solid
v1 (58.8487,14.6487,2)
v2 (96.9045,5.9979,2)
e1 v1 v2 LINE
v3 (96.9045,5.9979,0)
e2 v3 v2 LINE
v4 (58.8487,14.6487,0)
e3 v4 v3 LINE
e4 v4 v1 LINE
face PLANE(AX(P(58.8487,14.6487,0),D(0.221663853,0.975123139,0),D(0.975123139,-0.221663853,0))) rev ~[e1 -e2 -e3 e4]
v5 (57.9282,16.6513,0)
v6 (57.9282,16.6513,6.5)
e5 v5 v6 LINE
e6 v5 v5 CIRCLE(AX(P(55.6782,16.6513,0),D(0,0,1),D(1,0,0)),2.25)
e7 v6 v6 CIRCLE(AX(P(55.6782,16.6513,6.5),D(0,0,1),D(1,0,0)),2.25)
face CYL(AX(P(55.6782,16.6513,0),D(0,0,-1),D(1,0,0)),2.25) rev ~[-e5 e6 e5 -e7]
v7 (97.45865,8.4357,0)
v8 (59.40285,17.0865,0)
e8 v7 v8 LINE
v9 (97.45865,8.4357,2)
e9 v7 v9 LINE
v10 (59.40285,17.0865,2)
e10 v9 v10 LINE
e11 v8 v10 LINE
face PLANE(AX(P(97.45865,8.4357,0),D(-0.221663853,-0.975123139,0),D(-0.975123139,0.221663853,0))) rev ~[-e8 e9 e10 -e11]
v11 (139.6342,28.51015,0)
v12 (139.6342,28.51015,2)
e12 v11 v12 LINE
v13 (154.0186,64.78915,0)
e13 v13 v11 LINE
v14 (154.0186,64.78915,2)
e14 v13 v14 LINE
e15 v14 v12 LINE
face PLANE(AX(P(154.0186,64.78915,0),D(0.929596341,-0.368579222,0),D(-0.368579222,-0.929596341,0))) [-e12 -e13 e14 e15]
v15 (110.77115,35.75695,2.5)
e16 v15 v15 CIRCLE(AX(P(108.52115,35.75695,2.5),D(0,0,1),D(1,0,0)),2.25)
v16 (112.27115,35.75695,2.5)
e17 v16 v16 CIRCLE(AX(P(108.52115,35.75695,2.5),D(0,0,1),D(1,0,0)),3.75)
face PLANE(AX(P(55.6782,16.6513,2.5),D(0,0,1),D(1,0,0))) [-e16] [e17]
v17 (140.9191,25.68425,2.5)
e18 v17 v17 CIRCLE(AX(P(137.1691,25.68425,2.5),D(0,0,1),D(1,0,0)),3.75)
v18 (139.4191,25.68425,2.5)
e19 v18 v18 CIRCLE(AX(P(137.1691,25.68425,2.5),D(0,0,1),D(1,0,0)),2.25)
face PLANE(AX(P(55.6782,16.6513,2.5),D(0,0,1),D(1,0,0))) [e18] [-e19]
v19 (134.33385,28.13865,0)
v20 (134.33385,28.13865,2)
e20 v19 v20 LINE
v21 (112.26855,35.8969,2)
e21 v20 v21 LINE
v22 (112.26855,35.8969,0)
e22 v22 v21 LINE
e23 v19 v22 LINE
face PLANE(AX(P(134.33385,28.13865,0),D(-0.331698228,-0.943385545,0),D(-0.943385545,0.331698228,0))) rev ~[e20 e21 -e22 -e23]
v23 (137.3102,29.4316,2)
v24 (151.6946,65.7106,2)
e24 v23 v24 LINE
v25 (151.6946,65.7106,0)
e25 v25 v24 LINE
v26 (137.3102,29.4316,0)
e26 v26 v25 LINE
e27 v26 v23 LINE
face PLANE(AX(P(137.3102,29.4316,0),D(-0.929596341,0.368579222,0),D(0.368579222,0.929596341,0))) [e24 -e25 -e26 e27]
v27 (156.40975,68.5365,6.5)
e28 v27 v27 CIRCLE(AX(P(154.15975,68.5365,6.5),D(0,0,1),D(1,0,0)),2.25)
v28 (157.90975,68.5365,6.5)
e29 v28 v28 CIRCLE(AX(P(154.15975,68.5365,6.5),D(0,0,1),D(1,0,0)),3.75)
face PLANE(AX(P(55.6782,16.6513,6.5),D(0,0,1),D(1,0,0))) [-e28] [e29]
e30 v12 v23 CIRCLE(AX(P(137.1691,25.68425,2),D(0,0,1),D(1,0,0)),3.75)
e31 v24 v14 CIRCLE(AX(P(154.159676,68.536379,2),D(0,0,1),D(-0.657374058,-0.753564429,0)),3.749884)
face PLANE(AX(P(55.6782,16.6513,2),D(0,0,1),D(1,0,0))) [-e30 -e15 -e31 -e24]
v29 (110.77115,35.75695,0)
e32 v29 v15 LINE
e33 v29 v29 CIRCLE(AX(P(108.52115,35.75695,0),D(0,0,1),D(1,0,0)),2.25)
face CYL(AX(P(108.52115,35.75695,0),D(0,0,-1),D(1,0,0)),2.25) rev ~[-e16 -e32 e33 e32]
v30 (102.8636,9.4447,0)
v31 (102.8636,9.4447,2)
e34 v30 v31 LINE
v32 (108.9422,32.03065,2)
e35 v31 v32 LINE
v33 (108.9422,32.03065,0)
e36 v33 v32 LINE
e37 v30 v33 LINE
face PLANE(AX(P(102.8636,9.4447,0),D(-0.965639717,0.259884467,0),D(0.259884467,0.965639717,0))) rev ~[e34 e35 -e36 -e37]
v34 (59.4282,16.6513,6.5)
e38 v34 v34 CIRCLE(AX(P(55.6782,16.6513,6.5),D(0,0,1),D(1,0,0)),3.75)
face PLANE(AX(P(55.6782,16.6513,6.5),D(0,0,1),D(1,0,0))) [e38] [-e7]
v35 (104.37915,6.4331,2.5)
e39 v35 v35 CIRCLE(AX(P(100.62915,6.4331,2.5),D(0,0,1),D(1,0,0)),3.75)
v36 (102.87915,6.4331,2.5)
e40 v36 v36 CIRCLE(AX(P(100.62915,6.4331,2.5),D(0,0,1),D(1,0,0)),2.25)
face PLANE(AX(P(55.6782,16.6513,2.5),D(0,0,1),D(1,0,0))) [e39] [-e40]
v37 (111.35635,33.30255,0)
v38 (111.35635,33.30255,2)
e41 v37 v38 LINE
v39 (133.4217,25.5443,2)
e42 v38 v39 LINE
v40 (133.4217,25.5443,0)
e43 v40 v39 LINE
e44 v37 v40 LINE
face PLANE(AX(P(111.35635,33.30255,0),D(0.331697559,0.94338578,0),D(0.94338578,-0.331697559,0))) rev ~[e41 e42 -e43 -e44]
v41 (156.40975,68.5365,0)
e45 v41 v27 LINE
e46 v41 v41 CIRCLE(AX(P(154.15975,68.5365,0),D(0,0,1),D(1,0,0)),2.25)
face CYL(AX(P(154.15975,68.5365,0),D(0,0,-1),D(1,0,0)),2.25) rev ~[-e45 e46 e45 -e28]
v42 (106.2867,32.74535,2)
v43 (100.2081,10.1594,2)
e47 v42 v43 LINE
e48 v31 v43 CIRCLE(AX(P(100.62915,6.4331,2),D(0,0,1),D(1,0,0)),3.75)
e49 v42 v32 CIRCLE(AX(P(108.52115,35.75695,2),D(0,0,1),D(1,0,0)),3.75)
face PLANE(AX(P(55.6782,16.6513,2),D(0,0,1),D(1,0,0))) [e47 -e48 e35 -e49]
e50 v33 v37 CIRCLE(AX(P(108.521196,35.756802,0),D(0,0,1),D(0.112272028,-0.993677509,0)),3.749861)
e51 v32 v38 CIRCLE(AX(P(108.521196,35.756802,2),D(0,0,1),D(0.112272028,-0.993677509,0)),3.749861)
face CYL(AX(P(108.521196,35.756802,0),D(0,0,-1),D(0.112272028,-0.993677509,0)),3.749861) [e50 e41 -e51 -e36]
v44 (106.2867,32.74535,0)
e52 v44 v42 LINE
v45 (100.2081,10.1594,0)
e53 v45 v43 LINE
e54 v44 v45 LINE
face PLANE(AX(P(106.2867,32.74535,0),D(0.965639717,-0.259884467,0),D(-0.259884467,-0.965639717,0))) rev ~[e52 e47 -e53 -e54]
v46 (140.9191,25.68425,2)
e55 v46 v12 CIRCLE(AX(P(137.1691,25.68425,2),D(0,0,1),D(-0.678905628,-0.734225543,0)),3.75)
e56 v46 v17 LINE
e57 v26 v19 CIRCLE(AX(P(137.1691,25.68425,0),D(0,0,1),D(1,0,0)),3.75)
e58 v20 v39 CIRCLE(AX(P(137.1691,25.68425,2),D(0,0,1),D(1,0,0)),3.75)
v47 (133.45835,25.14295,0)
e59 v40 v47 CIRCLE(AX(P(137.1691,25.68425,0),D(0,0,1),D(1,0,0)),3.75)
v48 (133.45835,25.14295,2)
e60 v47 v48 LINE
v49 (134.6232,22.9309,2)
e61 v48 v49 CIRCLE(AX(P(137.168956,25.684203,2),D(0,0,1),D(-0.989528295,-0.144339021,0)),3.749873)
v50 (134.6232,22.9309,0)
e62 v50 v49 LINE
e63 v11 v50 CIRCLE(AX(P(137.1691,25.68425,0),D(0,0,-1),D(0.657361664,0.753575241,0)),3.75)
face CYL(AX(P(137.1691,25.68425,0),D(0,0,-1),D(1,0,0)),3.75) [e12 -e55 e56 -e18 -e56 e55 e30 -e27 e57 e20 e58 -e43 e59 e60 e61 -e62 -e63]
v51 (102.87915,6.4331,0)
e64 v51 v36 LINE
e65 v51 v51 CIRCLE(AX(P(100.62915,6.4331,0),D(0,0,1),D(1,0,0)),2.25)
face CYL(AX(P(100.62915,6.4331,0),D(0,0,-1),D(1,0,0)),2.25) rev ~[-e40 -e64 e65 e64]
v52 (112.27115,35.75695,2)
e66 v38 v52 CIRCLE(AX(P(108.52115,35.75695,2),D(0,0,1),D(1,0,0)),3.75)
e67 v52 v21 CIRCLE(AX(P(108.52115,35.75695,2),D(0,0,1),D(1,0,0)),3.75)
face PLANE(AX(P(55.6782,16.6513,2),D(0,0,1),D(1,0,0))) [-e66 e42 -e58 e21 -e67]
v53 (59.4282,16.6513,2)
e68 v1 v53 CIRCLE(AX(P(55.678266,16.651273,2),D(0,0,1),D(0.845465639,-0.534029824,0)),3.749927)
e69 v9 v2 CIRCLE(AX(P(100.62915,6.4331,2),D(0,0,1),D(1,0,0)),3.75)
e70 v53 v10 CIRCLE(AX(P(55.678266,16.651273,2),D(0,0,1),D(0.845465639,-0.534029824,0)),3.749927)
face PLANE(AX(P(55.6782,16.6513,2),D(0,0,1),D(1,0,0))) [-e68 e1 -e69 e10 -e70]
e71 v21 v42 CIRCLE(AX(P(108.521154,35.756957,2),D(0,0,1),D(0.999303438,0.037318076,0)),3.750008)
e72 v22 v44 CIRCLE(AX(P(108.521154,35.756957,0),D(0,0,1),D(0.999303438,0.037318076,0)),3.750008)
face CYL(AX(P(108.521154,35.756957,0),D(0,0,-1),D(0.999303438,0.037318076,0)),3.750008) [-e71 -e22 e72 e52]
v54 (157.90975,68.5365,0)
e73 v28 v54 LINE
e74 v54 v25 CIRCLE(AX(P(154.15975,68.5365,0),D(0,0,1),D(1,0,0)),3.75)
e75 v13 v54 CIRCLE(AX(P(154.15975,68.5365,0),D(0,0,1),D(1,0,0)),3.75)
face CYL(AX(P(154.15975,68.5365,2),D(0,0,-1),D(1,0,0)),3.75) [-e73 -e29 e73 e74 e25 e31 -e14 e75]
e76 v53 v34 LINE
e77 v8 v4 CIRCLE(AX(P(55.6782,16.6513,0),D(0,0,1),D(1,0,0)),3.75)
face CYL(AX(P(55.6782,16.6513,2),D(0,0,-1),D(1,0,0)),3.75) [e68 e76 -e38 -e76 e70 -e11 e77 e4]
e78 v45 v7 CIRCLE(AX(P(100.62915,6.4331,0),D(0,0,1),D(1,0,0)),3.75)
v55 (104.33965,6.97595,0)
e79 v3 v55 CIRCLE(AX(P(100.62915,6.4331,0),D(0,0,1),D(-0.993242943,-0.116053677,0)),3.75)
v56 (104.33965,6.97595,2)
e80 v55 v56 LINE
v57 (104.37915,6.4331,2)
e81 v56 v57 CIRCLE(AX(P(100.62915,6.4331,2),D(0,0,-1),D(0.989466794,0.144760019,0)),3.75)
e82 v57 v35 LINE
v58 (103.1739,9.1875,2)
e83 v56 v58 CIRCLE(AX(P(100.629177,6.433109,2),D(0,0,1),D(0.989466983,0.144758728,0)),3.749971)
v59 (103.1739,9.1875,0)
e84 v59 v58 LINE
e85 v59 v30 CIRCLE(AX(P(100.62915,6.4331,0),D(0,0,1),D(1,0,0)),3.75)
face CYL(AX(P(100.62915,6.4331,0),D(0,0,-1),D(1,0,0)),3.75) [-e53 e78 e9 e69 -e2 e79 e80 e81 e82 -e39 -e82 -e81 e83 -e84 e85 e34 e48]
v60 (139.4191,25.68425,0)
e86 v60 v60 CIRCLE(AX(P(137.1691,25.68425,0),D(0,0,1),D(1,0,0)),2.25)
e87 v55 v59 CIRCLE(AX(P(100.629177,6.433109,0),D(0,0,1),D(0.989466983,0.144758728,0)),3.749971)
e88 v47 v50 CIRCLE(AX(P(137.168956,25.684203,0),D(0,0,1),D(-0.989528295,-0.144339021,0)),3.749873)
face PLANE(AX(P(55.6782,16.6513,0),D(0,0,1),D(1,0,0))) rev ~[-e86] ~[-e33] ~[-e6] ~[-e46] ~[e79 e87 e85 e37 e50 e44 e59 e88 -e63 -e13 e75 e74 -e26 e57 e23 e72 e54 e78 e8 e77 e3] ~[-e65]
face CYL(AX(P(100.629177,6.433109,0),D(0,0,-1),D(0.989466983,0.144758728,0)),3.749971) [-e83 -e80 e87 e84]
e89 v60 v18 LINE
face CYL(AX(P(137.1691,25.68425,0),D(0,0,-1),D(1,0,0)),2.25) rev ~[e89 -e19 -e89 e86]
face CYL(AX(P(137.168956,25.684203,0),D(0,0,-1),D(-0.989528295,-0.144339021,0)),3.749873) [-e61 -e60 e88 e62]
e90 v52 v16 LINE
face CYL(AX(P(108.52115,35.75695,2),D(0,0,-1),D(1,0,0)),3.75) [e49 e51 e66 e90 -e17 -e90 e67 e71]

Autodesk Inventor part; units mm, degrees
ref_plane "YZ Plane" through (0, 0, 0) normal (1, 0, 0) x (0, 1, 0)
ref_plane "XZ Plane" through (0, 0, 0) normal (0, 1, 0) x (-1, 0, 0)
ref_plane "XY Plane" through (0, 0, 0) normal (0, 0, 1) x (1, 0, 0)
sketch "Sketch1" plane through (0, 0, 0) normal (0, 0, 1) x (1, 0, 0)
  line L0 (125.272, 1.0352) -> (94.9914, -14.9276) projected
  arc A0 (97.3229, -19.3507) -> (94.9914, -14.9276) centre (89.9019, -20.4364) ccw projected
  line L1 (97.3229, -19.3507) -> (127.6037, -3.3892) projected
  line L2 (157.89, 12.5592) -> (127.6037, -3.3892) projected
  arc A1 (155.5603, 16.9833) -> (157.89, 12.5592) centre (162.9818, 18.0659) ccw projected
  line L3 (125.272, 1.0352) -> (155.5603, 16.9833) projected
  circle A2 centre (162.9818, 18.0659) radius 4.5 projected
  circle A3 centre (162.9818, 18.0659) radius 7.5 projected
  arc A4 (192.0328, 98.1186) -> (196.6808, 96.2757) centre (196.9631, 103.7704) ccw projected
  line L4 (163.264, 25.5606) -> (192.0328, 98.1186) projected
  arc A5 (167.912, 23.7177) -> (163.264, 25.5606) centre (162.9818, 18.0659) ccw projected
  line L5 (196.6808, 96.2757) -> (167.912, 23.7177) projected
  circle A6 centre (196.9631, 103.7704) radius 4.5 projected
  circle A7 centre (196.9631, 103.7704) radius 7.5 projected
  circle A8 centre (89.9019, -20.4364) radius 4.5 projected
  circle A9 centre (89.9019, -20.4364) radius 7.5 projected
  arc A10 (6.341, -4.0052) -> (7.4493, 0.8704) centre (0, 0) ccw projected
  line L6 (6.341, -4.0052) -> (82.4526, -21.3068) projected
  arc A11 (83.5609, -16.4312) -> (82.4526, -21.3068) centre (89.9019, -20.4364) ccw projected
  line L7 (83.5609, -16.4312) -> (7.4493, 0.8704) projected
  circle A12 centre (0, 0) radius 4.5 projected
  circle A13 centre (0, 0) radius 7.5 projected
  circle A14 centre (105.6859, 38.2113) radius 3.464 construction
  circle A15 centre (101.9441, 45.313) radius 4.5 construction
  arc A16 (109.4545, 45.313) -> (97.6972, 39.1186) centre (101.9441, 45.313) ccw construction
  circle A17 centre (105.6859, 38.2113) radius 4.5
  line L8 (111.3563, 33.3025) -> (155.487, 17.786)
  arc A18 (106.528, 30.7587) -> (111.3563, 33.3025) centre (105.6859, 38.2113) ccw
  arc A19 (113.1807, 38.4912) -> (101.217, 32.1881) centre (105.6859, 38.2113) ccw
  line L9 (157.3113, 22.9747) -> (113.1807, 38.4912)
  line L10 (163.0842, 20.9449) -> (163.0574, 20.9543)
  line L11 (101.217, 32.1881) -> (89.0598, -12.9838)
  line L12 (94.3708, -14.4132) -> (106.528, 30.7587)
  point P0 (0, 0)
  point P1 (97.7939, 8.8875)
  point P2 (134.3338, 28.1386)
  dimension "d0" = 9
  dimension "d2" = 7.5104
  dimension "d5" = 0.002
extrude "Extrusion1" add sketch "Sketch1" along normal blind 4 contours A0 A9 | A3 A1 | A9 L11 A19 L9 A3 L8 A18 L12 | L6 A10 L7 A9 | A3 L4 A4 L5 | A13 A10 | A4 A7
sketch "Sketch2" plane through (0, 0, 4) normal (0, 0, 1) x (1, 0, 0)
  circle A0 centre (0, 0) radius 4.5
  circle A1 centre (0, 0) radius 7.5
  circle A2 centre (196.9631, 103.7704) radius 4.5 projected
  circle A3 centre (196.9631, 103.7704) radius 4.5
  circle A4 centre (196.9631, 103.7704) radius 7.5
extrude "Extrusion2" add sketch "Sketch2" along normal blind 9
sketch "Sketch3" plane through (0, 0, 4) normal (0, 0, 1) x (1, 0, 0)
  circle A0 centre (89.9019, -20.4364) radius 4.5 projected
  circle A1 centre (89.9019, -20.4364) radius 4.5
  circle A2 centre (89.9019, -20.4364) radius 7.5
  circle A3 centre (105.6859, 38.2113) radius 4.5 projected
  circle A4 centre (105.6859, 38.2113) radius 4.5
  circle A5 centre (105.6859, 38.2113) radius 7.5
  circle A6 centre (162.9818, 18.0659) radius 4.5 projected
  circle A7 centre (162.9818, 18.0659) radius 4.5
  circle A8 centre (162.9818, 18.0659) radius 7.5
  point P0 (0, 0)
extrude "Extrusion3" add sketch "Sketch3" along normal blind 1
scale "Scale1" factors (0.5, 0.5, 0.5) then translate (55.6782, 16.6513, 0) bodies 1
properties part number "MassiveGearHOlder"
